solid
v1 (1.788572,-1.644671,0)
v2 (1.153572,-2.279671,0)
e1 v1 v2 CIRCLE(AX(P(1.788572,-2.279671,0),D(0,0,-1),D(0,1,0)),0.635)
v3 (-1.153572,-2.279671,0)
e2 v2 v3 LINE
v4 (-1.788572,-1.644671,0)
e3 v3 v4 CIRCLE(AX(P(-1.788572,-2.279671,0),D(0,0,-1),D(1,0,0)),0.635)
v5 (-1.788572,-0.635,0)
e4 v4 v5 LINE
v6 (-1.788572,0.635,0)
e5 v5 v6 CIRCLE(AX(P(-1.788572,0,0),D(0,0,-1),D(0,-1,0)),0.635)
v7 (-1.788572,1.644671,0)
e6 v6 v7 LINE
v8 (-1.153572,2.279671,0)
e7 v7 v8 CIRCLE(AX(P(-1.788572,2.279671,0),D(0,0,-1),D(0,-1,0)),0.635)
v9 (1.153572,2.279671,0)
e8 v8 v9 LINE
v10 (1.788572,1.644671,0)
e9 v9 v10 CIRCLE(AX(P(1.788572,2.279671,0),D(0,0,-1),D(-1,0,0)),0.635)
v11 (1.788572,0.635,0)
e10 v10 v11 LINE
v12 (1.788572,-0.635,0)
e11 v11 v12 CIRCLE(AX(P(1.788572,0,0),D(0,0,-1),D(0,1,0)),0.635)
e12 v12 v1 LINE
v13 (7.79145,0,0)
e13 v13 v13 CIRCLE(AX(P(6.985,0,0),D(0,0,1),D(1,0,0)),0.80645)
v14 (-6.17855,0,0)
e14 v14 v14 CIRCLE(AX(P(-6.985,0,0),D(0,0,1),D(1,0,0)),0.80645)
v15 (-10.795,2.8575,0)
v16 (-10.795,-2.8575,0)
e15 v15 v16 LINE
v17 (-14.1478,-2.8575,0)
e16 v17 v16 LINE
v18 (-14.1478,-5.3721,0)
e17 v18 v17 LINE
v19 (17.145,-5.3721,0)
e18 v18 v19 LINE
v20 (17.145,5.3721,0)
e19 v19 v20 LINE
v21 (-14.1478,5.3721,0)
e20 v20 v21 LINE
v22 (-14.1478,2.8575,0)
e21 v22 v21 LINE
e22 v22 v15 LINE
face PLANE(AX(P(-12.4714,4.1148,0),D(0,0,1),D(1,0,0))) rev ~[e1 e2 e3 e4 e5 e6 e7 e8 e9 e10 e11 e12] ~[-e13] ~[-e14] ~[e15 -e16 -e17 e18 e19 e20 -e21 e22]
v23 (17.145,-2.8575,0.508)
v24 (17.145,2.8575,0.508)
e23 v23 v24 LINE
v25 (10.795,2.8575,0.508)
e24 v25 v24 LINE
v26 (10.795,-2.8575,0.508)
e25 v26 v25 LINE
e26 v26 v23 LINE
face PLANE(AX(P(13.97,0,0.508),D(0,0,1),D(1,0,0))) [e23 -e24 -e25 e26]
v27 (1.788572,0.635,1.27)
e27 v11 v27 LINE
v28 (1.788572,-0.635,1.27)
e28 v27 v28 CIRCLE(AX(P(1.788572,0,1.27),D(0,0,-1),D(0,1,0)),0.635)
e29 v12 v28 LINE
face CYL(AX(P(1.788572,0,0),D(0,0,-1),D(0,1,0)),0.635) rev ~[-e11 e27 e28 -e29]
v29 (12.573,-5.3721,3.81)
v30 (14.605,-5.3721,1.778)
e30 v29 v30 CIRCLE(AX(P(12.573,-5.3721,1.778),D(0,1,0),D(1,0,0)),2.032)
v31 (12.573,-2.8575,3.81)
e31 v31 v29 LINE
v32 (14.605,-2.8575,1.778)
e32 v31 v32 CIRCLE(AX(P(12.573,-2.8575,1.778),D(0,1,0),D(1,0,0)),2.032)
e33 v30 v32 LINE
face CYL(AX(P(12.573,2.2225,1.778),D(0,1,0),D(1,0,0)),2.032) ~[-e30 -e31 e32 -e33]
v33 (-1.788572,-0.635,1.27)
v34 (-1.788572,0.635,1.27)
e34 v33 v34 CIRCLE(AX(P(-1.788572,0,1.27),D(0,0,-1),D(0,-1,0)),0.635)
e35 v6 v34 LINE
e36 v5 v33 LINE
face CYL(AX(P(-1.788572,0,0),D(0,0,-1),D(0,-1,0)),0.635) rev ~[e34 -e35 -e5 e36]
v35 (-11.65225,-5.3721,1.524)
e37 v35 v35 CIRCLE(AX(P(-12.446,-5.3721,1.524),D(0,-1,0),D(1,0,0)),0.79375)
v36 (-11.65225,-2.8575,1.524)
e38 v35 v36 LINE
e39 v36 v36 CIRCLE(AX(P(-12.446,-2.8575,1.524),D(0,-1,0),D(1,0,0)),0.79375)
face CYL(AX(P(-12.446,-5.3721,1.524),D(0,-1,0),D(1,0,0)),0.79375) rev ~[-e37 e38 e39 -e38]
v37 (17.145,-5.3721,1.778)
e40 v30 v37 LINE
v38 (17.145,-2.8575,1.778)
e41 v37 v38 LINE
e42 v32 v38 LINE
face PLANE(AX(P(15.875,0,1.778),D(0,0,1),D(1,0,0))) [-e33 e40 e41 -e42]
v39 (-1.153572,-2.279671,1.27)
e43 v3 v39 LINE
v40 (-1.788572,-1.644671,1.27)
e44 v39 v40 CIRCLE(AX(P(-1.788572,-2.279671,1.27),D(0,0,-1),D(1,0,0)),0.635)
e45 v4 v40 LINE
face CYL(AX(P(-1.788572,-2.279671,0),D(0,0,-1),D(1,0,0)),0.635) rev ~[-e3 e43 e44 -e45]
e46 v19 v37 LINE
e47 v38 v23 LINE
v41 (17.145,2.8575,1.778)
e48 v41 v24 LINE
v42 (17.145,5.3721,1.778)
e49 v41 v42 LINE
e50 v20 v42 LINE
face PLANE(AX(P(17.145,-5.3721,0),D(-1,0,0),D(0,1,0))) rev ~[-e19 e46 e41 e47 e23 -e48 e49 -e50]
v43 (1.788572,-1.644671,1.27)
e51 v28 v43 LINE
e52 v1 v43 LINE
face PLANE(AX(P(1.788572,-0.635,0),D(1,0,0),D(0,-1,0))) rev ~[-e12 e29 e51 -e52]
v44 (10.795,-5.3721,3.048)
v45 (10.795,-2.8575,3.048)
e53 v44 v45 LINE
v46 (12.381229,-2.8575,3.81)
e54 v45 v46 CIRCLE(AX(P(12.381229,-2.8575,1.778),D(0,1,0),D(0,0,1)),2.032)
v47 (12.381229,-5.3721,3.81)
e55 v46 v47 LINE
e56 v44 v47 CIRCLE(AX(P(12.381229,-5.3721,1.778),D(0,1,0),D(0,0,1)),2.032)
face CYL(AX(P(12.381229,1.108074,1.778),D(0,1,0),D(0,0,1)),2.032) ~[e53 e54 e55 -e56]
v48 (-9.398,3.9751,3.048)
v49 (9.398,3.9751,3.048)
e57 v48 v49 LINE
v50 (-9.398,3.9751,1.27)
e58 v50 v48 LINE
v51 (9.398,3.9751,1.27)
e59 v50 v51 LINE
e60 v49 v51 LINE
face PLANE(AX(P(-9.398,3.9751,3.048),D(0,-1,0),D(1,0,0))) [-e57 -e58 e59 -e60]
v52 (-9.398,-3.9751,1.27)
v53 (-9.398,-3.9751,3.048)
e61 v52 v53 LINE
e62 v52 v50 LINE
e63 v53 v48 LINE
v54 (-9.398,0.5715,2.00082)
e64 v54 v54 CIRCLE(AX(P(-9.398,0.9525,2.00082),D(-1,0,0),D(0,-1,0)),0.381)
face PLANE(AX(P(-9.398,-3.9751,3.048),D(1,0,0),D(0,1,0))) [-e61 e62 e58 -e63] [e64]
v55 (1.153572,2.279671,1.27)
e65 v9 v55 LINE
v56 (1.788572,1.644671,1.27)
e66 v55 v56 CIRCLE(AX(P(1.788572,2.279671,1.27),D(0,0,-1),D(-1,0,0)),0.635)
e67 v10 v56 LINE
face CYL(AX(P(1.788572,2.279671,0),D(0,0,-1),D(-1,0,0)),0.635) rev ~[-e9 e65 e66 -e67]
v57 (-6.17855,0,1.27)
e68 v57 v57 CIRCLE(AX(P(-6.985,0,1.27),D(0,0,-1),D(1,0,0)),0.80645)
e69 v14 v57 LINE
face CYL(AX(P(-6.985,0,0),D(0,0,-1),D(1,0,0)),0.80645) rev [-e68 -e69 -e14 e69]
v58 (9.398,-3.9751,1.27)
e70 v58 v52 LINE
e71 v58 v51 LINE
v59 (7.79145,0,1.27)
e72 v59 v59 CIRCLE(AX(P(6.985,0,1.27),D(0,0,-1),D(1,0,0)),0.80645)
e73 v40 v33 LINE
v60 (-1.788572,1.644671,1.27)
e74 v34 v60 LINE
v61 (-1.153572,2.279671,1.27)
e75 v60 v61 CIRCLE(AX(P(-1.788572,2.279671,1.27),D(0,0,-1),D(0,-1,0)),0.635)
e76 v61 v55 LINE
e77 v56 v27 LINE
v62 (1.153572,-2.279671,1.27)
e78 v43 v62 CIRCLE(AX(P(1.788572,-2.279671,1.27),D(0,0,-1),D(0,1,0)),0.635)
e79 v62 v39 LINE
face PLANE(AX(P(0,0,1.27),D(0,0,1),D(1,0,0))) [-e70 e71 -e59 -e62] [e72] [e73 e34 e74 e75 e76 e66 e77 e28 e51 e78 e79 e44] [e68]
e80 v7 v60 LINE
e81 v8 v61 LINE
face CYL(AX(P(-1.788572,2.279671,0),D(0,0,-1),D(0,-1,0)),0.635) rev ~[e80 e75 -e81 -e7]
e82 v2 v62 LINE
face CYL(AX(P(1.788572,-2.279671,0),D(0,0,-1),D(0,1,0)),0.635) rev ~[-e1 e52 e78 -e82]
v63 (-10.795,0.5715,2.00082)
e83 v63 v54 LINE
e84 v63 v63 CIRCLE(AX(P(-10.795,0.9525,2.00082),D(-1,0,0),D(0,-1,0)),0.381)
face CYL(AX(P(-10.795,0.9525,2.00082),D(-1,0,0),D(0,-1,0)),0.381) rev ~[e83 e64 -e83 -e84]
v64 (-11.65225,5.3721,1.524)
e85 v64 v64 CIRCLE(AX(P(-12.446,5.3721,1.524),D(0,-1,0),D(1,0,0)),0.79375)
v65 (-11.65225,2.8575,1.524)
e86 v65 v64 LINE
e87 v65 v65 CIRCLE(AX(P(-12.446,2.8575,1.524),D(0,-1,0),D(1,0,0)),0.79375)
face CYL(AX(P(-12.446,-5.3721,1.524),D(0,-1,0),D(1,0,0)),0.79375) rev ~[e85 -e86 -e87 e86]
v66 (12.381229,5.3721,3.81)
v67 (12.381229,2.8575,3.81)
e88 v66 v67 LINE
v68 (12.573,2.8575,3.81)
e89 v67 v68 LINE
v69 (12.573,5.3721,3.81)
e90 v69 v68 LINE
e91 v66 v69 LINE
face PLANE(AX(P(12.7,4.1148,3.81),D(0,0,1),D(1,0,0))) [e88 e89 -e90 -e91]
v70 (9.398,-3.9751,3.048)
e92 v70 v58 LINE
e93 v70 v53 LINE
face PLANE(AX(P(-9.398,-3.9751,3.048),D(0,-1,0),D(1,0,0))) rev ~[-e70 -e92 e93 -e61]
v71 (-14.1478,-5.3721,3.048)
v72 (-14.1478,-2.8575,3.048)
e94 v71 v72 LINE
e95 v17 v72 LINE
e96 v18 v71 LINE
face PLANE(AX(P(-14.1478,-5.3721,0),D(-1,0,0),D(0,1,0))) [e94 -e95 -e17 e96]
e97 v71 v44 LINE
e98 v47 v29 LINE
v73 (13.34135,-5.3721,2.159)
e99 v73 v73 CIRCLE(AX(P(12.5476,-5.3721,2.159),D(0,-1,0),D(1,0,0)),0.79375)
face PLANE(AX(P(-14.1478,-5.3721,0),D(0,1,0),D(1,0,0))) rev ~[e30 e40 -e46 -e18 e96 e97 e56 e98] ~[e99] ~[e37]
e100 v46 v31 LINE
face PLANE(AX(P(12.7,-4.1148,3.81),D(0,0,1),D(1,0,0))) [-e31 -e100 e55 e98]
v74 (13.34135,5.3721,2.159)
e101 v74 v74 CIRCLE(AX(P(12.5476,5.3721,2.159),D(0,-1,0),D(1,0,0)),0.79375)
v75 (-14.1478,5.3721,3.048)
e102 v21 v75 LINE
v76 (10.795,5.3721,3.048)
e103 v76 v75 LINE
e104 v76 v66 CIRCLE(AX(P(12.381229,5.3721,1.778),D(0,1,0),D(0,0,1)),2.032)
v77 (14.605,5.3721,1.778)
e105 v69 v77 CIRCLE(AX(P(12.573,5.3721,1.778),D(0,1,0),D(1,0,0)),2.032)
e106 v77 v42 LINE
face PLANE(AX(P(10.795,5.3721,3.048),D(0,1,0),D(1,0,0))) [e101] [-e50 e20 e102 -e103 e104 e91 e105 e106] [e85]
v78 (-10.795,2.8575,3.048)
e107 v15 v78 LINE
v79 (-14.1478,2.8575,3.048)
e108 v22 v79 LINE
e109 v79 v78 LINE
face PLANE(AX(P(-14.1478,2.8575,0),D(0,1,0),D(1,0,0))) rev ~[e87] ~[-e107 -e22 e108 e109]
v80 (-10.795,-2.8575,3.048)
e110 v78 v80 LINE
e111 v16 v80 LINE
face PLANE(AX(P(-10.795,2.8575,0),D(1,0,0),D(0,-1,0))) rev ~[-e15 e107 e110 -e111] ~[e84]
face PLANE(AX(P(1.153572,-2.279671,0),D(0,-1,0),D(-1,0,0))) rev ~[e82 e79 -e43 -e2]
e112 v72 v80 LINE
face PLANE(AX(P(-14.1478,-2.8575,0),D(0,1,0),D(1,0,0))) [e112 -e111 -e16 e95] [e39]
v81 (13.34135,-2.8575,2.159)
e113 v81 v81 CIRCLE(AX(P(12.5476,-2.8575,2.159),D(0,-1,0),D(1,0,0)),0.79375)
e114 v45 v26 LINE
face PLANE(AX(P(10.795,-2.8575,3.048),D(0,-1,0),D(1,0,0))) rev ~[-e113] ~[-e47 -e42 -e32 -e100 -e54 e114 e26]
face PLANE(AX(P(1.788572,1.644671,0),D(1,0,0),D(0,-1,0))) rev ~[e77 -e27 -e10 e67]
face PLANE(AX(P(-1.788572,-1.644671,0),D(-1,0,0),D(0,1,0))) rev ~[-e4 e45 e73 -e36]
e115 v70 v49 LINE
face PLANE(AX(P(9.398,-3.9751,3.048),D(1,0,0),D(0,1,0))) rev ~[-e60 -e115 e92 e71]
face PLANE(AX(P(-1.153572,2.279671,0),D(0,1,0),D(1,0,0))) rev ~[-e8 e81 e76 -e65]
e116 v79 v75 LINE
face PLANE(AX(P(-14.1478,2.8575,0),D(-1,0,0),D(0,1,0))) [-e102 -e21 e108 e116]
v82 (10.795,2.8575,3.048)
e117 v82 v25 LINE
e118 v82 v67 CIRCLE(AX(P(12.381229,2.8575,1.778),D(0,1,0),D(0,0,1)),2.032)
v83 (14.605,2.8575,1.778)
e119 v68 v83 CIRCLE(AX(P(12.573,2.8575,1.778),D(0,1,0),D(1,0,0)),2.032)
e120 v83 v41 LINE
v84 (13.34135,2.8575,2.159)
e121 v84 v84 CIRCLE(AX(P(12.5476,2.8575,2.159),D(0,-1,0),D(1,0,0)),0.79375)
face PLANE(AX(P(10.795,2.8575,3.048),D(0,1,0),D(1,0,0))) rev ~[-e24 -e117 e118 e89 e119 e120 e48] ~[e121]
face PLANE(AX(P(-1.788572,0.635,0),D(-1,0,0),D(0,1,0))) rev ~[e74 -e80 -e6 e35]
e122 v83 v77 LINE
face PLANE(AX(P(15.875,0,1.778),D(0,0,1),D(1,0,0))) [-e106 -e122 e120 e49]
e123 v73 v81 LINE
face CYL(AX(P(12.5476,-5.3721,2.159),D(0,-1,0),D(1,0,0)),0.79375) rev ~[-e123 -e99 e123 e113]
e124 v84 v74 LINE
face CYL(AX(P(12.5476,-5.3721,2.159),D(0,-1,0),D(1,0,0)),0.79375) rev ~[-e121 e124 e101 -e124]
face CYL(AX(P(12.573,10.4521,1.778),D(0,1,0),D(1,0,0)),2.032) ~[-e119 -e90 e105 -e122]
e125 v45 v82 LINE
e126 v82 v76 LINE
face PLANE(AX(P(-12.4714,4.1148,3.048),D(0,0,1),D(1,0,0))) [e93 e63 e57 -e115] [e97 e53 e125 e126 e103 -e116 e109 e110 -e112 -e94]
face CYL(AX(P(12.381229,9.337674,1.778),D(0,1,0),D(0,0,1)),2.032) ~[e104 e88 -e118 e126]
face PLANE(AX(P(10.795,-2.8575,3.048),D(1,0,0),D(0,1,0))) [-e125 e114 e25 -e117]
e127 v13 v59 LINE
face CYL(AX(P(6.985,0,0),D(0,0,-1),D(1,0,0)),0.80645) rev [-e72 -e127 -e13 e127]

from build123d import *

# Parameters (mm, degrees)
F0_W         = 3.3528
F0_H         = 2.5146
F0_R         = 0.80645
F1_DEPTH     = 3.048
F2_W         = 2.54
F2_H         = 10.7442
F2_W_2       = 18.796
F2_H_2       = 7.9502
F3_DEPTH     = 1.27
F4_W         = 6.35
F4_H         = 5.715
F5_DEPTH     = 2.54
F6_R         = 0.79375
F7_DEPTH     = 10.7452
F8_DEPTH     = 0.508
F9_W         = 3.81
F9_H         = 2.5146
F10_DEPTH    = 0.762
F11_T1_DEPTH = 10.445747458
F11_T3_DEPTH = 10.445747458
F11_T5_DEPTH = 12.6746
F11_T7_DEPTH = 12.6746
F12_R        = 0.381
F8_FACE_W    = 7.9502
F8_FACE_H    = 1.778
F13_DEPTH    = 1.397


# Not quite as in the source:
# - a fillet or chamfer that OpenCascade refuses, or shapes differently, is made with other operations: its cross-section is extruded or revolved along the edge and cut away or added


with BuildPart() as f1:
    # F0 (on Top) → F1 (new body)
    with BuildSketch(Plane.XY):
        with Locations((-12.4714, 4.1148)):
            Rectangle(F0_W, F0_H)
        with Locations((-12.4714, -4.1148)):
            Rectangle(F0_W, F0_H)
        Polygon((10.795, 5.3721), (-10.795, 5.3721), (-10.795, 2.8575), (-10.795, -2.8575), (-10.795, -5.3721), (10.795, -5.3721), (17.145, -5.3721), (17.145, 5.3721), align=None)
        with Locations((-6.985, 0)):
            Circle(F0_R, mode=Mode.SUBTRACT)
        with BuildLine():
            ThreePointArc((-1.7885716042, 1.644670926), (-2.2375844102, 2.728683732), (-1.1535716042, 2.279670926))
            Line((-1.1535716042, 2.279670926), (1.1535716042, 2.279670926))
            ThreePointArc((1.1535716042, 2.279670926), (2.2375844102, 2.728683732), (1.7885716042, 1.644670926))
            Line((1.7885716042, 1.644670926), (1.7885716042, 0.635))
            ThreePointArc((1.7885716042, 0.635), (2.4235716042, 0), (1.7885716042, -0.635))
            Line((1.7885716042, -0.635), (1.7885716042, -1.644670926))
            ThreePointArc((1.7885716042, -1.644670926), (2.2375844102, -2.728683732), (1.1535716042, -2.279670926))
            Line((1.1535716042, -2.279670926), (-1.1535716042, -2.279670926))
            ThreePointArc((-1.1535716042, -2.279670926), (-2.2375844102, -2.728683732), (-1.7885716042, -1.644670926))
            Line((-1.7885716042, -1.644670926), (-1.7885716042, -0.635))
            ThreePointArc((-1.7885716042, -0.635), (-2.4235716042, 0), (-1.7885716042, 0.635))
            Line((-1.7885716042, 0.635), (-1.7885716042, 1.644670926))
        make_face(mode=Mode.SUBTRACT)
        with Locations((6.985, 0)):
            Circle(F0_R, mode=Mode.SUBTRACT)
    extrude(amount=F1_DEPTH)

    # F2 (on face) → F3 (cut)
    with BuildSketch(Plane.XY.offset(3.048)):
        with Locations((15.875, 0)):
            Rectangle(F2_W, F2_H)
        Rectangle(F2_W_2, F2_H_2)
    extrude(amount=-F3_DEPTH, mode=Mode.SUBTRACT)

    # F4 (on face) → F5 (cut)
    with BuildSketch(Plane.XY.offset(3.048)):
        with Locations((13.97, 0)):
            Rectangle(F4_W, F4_H)
    extrude(amount=-F5_DEPTH, mode=Mode.SUBTRACT)

    # F6 (on face) → F7 (cut, through all)
    with BuildSketch(Plane.XZ.offset(5.3721)):
        with Locations((-12.446, 1.524)):
            Circle(F6_R)
        with Locations((12.5476, 2.159)):
            Circle(F6_R)
    extrude(amount=-F7_DEPTH, mode=Mode.SUBTRACT)

    # F8 (cut): a face of the model
    f8_faces = [f1.faces().sort_by_distance(p)[0] for p in [
        (0, 3.7710178361, 1.778),
    ]]
    extrude(f8_faces, amount=-F8_DEPTH, mode=Mode.SUBTRACT)

    # F9 (on face) → F10 (join)
    with BuildSketch(Plane.XY.offset(3.048)):
        with Locations((12.7, 4.1148)):
            Rectangle(F9_W, F9_H)
        with Locations((12.7, -4.1148)):
            Rectangle(F9_W, F9_H)
    extrude(amount=F10_DEPTH)

    # F11: fillet of radius 2.032 on 4 edges, made by hand

    # F11_s2 → F11_t1 (cut)
    with BuildSketch(Plane.XZ.offset(-1.108073729)):
        with BuildLine():
            ThreePointArc((12.3812294916, 3.81), (11.5013476813, 3.6096200479), (10.795, 3.048))
            Line((10.795, 3.048), (10.795, 3.81))
            Line((10.795, 3.81), (12.3812294916, 3.81))
        make_face()
    extrude(amount=F11_T1_DEPTH, mode=Mode.SUBTRACT)

    # F11_s4 → F11_t3 (cut)
    with BuildSketch(Plane.XZ.offset(-9.337673729)):
        with BuildLine():
            ThreePointArc((12.3812294916, 3.81), (11.5013476813, 3.6096200479), (10.795, 3.048))
            Line((10.795, 3.048), (10.795, 3.81))
            Line((10.795, 3.81), (12.3812294916, 3.81))
        make_face()
    extrude(amount=F11_T3_DEPTH, mode=Mode.SUBTRACT)

    # F11_s6 → F11_t5 (cut)
    with BuildSketch(Plane.XZ.offset(-10.4521)):
        with BuildLine():
            ThreePointArc((14.605, 1.778), (14.0098409794, 3.2148409794), (12.573, 3.81))
            Line((12.573, 3.81), (14.605, 3.81))
            Line((14.605, 3.81), (14.605, 1.778))
        make_face()
    extrude(amount=F11_T5_DEPTH, mode=Mode.SUBTRACT)

    # F11_s8 → F11_t7 (cut)
    with BuildSketch(Plane.XZ.offset(-2.2225)):
        with BuildLine():
            ThreePointArc((14.605, 1.778), (14.0098409794, 3.2148409794), (12.573, 3.81))
            Line((12.573, 3.81), (14.605, 3.81))
            Line((14.605, 3.81), (14.605, 1.778))
        make_face()
    extrude(amount=F11_T7_DEPTH, mode=Mode.SUBTRACT)

    # F12 (on face) + F8_face (on face) → F13 (cut, through all)
    with BuildSketch(Plane(origin=(-10.795, 0, 0), x_dir=(0, -1, 0), z_dir=(-1, 0, 0))):
        with Locations((-0.9525, 2.0008196589)):
            Circle(F12_R)
    with BuildSketch(Plane(origin=(-9.398, 0, 2.159), x_dir=(0, 1, 0), z_dir=(1, 0, 0))):
        Rectangle(F8_FACE_W, F8_FACE_H)
    extrude(amount=-F13_DEPTH, dir=(-1, 0, 0), mode=Mode.SUBTRACT)


solid = f1.part
